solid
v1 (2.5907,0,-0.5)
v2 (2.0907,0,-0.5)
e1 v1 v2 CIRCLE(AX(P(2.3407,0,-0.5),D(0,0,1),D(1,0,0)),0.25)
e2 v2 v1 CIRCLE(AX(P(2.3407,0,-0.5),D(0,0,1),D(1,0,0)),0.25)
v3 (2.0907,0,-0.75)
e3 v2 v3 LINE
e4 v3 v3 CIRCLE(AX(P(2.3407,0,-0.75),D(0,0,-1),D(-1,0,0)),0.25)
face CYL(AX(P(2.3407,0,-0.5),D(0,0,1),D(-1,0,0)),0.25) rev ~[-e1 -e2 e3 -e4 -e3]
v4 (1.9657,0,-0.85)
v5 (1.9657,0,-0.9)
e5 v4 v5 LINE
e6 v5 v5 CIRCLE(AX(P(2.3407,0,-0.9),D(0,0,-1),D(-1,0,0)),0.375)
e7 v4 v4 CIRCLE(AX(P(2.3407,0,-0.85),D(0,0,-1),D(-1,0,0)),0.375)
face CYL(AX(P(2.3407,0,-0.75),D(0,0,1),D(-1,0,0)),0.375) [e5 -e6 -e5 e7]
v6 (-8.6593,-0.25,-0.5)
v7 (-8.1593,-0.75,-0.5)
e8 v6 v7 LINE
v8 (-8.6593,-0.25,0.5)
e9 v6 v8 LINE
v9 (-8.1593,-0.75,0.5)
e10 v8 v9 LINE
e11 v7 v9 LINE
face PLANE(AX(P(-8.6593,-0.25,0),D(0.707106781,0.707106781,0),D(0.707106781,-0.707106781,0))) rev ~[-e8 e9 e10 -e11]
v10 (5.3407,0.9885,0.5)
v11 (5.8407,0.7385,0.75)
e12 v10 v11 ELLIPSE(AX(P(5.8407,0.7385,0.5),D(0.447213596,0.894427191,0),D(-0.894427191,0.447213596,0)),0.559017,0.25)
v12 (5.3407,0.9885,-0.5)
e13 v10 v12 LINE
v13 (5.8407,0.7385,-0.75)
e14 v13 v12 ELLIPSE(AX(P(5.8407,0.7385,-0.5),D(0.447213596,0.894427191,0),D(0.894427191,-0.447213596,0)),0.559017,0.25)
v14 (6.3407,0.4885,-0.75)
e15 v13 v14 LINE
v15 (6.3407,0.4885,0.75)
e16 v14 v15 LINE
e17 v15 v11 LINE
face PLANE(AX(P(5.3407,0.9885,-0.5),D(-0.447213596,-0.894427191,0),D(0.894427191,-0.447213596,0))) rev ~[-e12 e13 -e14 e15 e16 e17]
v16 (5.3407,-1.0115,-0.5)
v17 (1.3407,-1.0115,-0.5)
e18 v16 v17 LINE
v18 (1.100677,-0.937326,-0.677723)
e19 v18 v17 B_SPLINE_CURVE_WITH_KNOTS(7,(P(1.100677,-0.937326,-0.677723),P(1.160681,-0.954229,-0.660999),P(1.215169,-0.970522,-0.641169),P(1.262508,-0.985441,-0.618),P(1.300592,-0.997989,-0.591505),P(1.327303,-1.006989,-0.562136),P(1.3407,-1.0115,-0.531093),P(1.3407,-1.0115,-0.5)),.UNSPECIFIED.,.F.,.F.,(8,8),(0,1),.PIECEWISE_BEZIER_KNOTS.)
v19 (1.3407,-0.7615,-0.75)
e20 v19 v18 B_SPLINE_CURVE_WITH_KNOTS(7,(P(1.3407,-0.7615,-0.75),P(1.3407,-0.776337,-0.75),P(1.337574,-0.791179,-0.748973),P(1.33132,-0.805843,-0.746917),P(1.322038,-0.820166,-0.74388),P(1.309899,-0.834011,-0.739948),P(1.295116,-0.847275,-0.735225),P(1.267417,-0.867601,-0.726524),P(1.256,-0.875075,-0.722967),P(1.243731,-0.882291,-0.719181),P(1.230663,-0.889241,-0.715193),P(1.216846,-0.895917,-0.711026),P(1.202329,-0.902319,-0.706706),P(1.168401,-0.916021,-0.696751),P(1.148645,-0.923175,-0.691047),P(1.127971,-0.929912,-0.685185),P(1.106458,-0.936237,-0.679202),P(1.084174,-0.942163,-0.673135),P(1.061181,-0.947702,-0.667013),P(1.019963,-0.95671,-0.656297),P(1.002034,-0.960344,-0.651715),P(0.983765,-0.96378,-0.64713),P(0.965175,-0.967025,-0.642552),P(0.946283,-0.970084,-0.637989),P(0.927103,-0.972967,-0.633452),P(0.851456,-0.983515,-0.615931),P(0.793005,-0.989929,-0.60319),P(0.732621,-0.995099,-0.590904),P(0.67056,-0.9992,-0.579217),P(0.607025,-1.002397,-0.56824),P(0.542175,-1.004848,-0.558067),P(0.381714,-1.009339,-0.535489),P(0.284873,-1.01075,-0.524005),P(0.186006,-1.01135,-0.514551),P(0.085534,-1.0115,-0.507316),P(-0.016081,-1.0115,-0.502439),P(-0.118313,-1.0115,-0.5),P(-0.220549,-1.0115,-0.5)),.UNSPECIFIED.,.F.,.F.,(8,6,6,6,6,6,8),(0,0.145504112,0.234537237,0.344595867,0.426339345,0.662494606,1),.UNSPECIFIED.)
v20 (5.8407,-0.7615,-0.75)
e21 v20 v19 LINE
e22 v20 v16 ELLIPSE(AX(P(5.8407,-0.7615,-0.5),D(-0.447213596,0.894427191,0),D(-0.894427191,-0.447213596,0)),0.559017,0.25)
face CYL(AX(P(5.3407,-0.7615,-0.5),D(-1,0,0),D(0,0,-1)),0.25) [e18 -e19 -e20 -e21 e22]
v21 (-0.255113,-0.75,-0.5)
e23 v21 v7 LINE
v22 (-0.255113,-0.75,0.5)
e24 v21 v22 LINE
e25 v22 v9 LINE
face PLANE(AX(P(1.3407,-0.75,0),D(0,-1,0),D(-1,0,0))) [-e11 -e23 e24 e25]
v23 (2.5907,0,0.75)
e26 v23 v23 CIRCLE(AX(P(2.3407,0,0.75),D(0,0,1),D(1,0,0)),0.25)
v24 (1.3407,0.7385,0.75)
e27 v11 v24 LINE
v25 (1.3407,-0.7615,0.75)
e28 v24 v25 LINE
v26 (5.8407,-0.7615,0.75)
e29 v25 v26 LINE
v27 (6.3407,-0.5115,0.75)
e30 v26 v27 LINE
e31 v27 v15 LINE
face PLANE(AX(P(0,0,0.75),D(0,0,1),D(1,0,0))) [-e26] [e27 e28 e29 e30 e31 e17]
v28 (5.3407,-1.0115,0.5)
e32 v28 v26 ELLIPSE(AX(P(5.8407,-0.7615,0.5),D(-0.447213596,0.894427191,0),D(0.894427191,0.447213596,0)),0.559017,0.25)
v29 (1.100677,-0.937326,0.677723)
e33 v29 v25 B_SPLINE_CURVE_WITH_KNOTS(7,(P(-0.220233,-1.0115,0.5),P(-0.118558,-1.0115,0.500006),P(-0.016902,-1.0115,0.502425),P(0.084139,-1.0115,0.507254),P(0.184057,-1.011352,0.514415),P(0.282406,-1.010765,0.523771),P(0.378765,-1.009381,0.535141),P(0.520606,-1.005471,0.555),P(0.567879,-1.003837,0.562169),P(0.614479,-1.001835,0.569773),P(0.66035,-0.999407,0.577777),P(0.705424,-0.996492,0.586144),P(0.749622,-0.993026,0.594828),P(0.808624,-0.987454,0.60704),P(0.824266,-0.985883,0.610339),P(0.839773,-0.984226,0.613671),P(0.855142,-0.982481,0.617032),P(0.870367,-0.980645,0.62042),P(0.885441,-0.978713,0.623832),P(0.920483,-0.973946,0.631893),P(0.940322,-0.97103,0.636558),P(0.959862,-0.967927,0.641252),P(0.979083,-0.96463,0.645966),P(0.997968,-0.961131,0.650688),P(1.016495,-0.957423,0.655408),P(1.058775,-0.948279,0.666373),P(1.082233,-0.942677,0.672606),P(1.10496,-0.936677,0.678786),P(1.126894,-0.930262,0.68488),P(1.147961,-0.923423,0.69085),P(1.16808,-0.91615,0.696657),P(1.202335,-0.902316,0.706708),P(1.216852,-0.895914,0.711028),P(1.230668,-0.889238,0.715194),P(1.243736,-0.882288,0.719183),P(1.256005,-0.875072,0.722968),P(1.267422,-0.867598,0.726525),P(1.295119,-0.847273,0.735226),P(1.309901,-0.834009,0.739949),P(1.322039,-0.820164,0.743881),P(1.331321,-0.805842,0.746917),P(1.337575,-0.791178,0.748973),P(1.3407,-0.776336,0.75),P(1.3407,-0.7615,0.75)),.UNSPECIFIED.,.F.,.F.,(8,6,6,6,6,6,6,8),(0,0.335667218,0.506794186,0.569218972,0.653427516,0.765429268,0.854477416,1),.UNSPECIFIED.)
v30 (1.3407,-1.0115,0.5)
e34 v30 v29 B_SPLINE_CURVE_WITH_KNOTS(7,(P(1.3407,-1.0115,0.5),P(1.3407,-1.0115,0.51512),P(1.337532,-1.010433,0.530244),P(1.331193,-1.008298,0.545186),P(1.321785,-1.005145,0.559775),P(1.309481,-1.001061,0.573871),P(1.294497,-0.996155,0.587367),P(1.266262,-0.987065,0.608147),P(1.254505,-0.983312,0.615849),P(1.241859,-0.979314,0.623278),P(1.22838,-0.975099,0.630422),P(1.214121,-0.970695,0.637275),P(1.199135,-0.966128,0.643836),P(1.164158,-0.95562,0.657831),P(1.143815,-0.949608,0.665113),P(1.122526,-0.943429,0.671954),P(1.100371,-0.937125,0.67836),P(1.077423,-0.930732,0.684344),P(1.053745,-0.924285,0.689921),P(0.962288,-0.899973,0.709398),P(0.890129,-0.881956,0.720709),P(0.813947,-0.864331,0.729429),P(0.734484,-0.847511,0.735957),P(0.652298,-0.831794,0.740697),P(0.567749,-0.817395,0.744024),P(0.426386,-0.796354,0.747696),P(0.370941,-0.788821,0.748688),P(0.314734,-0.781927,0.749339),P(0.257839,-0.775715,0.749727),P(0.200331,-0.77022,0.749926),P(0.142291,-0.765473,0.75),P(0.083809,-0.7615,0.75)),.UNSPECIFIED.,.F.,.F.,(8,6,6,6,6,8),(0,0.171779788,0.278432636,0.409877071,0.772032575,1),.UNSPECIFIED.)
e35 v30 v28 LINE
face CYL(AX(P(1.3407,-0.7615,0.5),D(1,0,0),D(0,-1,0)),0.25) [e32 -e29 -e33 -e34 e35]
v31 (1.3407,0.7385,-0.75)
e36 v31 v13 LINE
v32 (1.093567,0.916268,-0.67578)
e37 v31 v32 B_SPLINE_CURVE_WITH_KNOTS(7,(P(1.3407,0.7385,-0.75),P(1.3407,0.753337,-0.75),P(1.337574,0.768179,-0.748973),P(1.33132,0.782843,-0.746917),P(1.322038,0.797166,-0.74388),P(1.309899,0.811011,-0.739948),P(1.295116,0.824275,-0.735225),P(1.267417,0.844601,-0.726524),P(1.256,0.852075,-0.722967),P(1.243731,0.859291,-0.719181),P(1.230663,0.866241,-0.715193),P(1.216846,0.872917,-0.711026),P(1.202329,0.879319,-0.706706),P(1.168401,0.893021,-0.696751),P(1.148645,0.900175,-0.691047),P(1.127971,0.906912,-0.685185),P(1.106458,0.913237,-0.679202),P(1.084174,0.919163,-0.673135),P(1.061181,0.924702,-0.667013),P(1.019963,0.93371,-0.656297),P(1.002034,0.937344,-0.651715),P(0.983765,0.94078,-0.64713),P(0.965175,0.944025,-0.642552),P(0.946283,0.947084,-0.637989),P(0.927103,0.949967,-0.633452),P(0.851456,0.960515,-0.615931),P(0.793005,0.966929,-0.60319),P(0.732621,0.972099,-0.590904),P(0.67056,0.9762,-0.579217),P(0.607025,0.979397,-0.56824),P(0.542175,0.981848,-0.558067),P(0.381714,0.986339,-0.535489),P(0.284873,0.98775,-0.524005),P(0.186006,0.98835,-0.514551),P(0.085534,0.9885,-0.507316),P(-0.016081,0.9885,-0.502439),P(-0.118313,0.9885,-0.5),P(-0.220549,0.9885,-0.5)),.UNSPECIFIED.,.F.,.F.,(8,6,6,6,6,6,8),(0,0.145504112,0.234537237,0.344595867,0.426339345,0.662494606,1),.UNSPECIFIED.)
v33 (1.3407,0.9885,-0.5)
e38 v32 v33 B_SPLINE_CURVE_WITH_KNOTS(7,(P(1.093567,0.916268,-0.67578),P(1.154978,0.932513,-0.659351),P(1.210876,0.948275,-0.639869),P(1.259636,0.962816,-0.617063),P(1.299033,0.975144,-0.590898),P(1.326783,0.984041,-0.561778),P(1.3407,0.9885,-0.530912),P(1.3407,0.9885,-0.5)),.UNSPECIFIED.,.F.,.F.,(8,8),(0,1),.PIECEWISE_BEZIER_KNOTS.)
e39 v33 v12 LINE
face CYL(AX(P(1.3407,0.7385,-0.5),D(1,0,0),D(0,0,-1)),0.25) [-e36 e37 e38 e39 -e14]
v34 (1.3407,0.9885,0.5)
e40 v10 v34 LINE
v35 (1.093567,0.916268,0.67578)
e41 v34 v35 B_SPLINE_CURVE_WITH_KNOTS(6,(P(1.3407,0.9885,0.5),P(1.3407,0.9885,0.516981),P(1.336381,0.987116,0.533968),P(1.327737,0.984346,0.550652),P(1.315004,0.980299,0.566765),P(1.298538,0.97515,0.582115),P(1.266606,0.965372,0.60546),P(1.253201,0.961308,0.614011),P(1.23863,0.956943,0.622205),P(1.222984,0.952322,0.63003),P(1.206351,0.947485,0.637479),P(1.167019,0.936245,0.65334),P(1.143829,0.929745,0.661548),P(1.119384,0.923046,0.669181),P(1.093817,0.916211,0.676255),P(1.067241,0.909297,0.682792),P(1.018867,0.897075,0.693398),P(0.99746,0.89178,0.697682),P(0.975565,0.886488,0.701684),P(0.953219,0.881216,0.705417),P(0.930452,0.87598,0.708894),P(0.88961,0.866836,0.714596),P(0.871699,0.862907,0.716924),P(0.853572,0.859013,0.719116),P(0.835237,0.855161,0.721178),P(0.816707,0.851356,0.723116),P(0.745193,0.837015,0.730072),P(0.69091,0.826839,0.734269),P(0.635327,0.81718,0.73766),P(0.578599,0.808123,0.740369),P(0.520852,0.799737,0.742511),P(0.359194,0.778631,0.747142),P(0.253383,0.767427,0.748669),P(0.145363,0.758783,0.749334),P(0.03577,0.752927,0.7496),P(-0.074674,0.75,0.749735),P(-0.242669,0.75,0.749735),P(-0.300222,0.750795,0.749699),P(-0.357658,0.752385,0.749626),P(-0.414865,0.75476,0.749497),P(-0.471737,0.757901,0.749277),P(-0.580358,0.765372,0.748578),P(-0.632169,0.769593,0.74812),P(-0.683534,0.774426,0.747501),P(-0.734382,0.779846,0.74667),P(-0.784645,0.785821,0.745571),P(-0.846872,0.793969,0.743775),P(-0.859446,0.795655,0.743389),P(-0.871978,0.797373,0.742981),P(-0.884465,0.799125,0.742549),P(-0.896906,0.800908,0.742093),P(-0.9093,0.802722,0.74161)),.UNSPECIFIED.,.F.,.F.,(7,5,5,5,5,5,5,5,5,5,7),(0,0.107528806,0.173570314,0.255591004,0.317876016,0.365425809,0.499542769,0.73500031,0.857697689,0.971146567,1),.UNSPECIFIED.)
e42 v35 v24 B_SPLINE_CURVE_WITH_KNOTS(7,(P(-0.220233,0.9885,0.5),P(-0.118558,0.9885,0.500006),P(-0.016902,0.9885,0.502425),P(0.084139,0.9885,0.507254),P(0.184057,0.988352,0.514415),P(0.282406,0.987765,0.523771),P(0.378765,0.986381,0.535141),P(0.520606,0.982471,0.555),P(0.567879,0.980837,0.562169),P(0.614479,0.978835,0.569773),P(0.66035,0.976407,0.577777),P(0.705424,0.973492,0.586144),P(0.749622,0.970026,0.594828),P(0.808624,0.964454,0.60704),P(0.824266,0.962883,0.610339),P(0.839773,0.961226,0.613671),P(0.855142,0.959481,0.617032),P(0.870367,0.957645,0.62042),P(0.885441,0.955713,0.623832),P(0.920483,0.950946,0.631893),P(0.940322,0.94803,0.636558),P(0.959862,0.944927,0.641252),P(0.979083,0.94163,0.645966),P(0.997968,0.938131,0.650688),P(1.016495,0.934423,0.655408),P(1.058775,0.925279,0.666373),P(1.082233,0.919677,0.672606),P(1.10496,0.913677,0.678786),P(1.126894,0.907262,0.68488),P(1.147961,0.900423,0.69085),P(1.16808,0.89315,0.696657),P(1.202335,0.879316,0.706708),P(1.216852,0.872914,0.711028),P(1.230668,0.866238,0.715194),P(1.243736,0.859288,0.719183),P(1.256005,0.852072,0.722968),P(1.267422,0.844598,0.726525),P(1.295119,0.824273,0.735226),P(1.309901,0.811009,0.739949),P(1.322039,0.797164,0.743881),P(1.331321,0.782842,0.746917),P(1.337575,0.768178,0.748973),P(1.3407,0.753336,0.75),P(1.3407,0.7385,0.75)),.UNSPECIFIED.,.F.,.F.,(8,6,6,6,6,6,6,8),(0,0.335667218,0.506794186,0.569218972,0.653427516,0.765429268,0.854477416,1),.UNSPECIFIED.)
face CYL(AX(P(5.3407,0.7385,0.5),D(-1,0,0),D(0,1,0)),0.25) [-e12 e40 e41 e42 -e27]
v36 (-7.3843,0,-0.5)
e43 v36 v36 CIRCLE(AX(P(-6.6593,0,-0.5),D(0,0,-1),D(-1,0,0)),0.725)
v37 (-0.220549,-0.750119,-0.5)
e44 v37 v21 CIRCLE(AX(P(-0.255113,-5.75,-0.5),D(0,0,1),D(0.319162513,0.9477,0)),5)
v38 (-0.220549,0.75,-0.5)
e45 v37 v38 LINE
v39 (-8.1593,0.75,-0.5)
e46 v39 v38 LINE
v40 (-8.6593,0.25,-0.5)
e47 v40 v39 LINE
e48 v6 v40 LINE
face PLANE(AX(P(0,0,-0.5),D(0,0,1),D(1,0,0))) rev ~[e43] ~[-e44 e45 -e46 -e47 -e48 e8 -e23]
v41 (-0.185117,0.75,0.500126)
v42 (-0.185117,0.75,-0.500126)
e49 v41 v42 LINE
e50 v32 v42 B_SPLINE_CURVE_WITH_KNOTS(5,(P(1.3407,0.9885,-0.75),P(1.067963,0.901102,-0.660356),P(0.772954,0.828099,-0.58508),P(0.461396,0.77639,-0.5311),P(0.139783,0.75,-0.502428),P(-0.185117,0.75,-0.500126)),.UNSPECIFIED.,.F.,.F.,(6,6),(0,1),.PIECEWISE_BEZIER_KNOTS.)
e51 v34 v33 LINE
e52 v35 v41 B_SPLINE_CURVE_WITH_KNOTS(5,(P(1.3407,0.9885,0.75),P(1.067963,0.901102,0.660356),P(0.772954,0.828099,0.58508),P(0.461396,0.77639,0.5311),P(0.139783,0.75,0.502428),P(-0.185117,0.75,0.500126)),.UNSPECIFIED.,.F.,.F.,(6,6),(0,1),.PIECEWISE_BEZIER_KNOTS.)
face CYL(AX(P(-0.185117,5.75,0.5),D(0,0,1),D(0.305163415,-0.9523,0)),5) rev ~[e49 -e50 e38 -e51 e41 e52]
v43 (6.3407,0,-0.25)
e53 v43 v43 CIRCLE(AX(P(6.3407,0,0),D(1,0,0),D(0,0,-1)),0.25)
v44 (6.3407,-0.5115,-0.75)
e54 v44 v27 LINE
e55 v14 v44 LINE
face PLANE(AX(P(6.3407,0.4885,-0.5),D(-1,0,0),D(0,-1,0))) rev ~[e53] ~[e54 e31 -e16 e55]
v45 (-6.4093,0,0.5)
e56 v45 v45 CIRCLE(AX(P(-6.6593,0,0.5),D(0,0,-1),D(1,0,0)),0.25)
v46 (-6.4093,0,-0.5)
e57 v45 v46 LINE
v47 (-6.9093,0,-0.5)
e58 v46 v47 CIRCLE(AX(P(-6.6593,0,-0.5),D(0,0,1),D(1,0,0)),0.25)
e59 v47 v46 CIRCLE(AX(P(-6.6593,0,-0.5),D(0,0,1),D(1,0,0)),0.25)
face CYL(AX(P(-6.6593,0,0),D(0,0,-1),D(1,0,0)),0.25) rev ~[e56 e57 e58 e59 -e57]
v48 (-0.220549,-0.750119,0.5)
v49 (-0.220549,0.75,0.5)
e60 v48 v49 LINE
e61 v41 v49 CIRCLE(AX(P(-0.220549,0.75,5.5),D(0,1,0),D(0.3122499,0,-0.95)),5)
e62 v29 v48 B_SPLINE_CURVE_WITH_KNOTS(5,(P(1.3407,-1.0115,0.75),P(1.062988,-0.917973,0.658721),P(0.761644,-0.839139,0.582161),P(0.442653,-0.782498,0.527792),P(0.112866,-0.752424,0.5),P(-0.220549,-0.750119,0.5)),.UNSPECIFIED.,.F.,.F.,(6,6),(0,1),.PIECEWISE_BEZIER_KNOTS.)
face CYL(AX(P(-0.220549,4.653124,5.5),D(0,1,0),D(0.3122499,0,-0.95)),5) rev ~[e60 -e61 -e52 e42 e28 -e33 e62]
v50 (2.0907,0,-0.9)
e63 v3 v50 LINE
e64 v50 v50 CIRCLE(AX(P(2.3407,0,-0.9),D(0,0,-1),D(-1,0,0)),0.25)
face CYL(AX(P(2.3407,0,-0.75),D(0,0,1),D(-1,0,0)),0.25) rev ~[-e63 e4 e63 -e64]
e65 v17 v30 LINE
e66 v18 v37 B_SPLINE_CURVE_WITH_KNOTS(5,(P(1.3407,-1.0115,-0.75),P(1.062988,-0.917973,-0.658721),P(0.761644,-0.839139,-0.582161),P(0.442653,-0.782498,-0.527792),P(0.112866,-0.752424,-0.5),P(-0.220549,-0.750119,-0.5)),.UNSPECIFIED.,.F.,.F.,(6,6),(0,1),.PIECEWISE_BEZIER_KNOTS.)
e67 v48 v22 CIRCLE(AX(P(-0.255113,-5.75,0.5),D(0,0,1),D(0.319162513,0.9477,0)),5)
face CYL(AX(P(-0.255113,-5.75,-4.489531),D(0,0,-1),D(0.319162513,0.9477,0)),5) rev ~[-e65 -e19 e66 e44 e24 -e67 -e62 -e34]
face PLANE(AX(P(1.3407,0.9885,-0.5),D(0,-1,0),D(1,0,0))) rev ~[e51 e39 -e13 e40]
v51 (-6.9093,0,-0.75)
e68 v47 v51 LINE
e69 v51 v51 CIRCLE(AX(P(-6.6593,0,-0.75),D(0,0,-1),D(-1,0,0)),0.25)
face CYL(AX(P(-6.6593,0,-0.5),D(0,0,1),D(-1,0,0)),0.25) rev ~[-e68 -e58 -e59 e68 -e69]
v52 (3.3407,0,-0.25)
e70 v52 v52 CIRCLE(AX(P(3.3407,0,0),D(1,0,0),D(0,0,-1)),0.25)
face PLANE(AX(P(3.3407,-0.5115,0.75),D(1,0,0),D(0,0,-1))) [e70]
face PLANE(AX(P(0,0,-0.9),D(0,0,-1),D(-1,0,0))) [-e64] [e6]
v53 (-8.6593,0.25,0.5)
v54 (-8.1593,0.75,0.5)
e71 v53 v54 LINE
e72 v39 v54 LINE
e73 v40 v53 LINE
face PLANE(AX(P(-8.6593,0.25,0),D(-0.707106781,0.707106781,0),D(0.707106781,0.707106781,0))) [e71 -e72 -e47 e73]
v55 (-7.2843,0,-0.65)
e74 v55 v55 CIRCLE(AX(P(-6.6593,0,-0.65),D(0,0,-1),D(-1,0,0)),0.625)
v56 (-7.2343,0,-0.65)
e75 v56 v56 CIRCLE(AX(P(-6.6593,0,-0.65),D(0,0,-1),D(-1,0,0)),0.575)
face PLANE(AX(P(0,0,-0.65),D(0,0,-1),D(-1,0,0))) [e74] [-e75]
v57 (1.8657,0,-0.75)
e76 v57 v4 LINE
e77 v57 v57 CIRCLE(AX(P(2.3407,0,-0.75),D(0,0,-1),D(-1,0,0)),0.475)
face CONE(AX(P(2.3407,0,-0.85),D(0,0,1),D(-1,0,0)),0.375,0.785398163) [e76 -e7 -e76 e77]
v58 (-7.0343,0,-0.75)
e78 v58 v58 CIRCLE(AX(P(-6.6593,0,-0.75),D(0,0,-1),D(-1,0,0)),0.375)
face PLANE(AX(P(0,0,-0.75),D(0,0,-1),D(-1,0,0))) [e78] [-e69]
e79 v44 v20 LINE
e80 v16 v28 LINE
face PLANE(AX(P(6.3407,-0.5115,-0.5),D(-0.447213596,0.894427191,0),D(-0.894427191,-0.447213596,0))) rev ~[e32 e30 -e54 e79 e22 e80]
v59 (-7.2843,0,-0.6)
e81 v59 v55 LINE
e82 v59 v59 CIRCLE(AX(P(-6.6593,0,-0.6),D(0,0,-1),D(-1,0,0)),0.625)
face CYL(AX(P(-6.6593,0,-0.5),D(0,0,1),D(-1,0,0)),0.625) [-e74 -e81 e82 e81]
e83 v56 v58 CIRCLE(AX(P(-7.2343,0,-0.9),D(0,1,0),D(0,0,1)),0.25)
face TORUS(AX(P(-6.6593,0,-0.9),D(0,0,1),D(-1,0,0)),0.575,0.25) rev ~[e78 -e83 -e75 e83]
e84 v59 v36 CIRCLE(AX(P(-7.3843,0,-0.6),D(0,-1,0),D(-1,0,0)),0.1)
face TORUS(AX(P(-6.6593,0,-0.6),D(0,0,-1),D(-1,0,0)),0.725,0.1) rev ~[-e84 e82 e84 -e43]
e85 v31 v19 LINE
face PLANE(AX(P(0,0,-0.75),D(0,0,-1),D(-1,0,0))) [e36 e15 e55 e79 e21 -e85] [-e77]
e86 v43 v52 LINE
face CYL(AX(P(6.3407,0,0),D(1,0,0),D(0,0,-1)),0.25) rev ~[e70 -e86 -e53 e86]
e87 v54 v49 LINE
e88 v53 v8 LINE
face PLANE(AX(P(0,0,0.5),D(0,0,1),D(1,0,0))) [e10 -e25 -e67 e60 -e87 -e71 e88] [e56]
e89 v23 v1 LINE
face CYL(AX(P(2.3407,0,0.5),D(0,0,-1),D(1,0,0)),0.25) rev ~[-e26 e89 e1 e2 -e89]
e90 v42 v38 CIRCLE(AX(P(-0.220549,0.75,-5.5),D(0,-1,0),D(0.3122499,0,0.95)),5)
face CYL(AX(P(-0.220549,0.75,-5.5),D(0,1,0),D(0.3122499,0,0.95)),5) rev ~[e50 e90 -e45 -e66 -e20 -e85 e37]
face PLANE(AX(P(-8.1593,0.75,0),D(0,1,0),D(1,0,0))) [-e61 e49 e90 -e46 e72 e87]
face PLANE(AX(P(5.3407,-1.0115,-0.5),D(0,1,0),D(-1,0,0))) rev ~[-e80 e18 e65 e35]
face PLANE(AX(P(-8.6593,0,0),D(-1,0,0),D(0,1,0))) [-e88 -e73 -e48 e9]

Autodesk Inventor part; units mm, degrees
ref_plane "YZ Plane" through (0, 0, 0) normal (1, 0, 0) x (0, 1, 0)
ref_plane "XZ Plane" through (0, 0, 0) normal (0, 1, 0) x (-1, 0, 0)
ref_plane "XY Plane" through (0, 0, 0) normal (0, 0, 1) x (1, 0, 0)
sketch "Sketch1" plane through (0, 0, 0) normal (0, 0, 1) x (1, 0, 0)
  line L0 (-8.1593, 0.75) -> (1.3407, 0.75)
  line L1 (1.3407, -0.75) -> (-8.1593, -0.75)
  line L2 (-8.6593, -0.25) -> (-8.6593, 0.25)
  circle A0 centre (-6.6593, 0) radius 0.25
  circle A1 centre (2.3407, 0) radius 0.25
  line L3 (-11.6593, 0) -> (9.3407, 0) projected
  line L4 (1.3407, -0.75) -> (1.3407, -1.0115)
  line L5 (1.3407, 0.75) -> (1.3407, 0.9885)
  line L6 (-8.1593, 0.75) -> (-8.1593, 0.75)
  line L7 (-8.6593, 0.25) -> (-8.6593, 0.25)
  line L8 (-8.1593, -0.75) -> (-8.1593, -0.75)
  line L9 (-8.6593, -0.25) -> (-8.6593, -0.25)
  line L10 (1.3407, 0.9885) -> (5.3407, 0.9885)
  line L11 (6.3407, 0.4885) -> (6.3407, -0.5115)
  line L12 (1.3407, -1.0115) -> (5.3407, -1.0115)
  line L13 (5.3407, -1.0115) -> (6.3407, -0.5115)
  line L14 (5.3407, 0.9885) -> (6.3407, 0.4885)
  line L15 (-8.6593, 0.25) -> (-8.1593, 0.75)
  line L16 (-8.6593, -0.25) -> (-8.1593, -0.75)
  point P0 (0, 0)
  point P1 (-8.6593, 0.75)
  point P2 (-8.6593, -0.75)
  point P3 (6.3407, -1.0115)
  point P4 (6.3407, 0.9885)
  point P5 (-8.6593, 0)
  point P6 (6.3407, 0.9885)
  dimension "d2" = 0.5
  dimension "d4" = 0.5
  dimension "d34" = 9
  dimension "d36" = 1.5
  dimension "d37" = 2
  dimension "d38" = 2
  dimension "d39" = 8
  dimension "d40" = 5
  dimension "d56" = 1
  dimension "d57" = 0.5
  dimension "d58" = 1
  dimension "d59" = 0.5
  dimension "d60" = 0.5
  dimension "d61" = 0.5
  dimension "d62" = 0.5
  dimension "d63" = 0.5
extrude "Extrusion1" add sketch "Sketch1" along normal mid plane 1 contours L0 L5 L10 L14 L11 L3 A1 A0 L2 L15 | L3 A0 A1 L11 L13 L12 L4 L1 L16 L2
sketch "Sketch2" plane through (0, 0, 0.5) normal (0, 0, 1) x (1, 0, 0)
  circle A0 centre (2.3407, 0) radius 0.25 projected
  circle A1 centre (-6.6593, 0) radius 0.25 projected
  line L0 (1.3407, 0.75) -> (-8.1593, 0.75) projected
  line L1 (-8.6593, 0.25) -> (-8.6593, -0.25) projected
  line L2 (-8.1593, -0.75) -> (1.3407, -0.75) projected
  line L3 (1.3407, 0.75) -> (-8.1593, 0.75) projected
  line L4 (1.3407, 0.75) -> (1.3407, -0.75)
  line L5 (1.3407, -0.75) -> (1.3407, -1.0115) projected
  line L6 (1.3407, 0.9885) -> (1.3407, 0.75) projected
  line L7 (1.3407, -1.0115) -> (5.3407, -1.0115) projected
  line L8 (5.3407, -1.0115) -> (6.3407, -0.5115) projected
  line L9 (6.3407, -0.5115) -> (6.3407, 0.4885) projected
  line L10 (6.3407, 0.4885) -> (5.3407, 0.9885) projected
  line L11 (5.3407, 0.9885) -> (1.3407, 0.9885) projected
  line L12 (-8.1593, 0.75) -> (-8.6593, 0.25) projected
  line L13 (-8.6593, -0.25) -> (-8.1593, -0.75) projected
  point P0 (0, 0)
  point P1 (-8.6593, 0.75)
extrude "Extrusion2" add sketch "Sketch2" along normal blind 0.25 contours L6 L11 L10 L9 L8 L7 L5 L4
sketch "Sketch3" plane through (0, 0, -0.5) normal (0, 0, -1) x (-1, 0, 0)
  circle A0 centre (-2.3407, 0) radius 0.25 projected
  circle A1 centre (6.6593, 0) radius 0.25 projected
  line L0 (8.1593, 0.75) -> (-1.3407, 0.75) projected
  line L1 (-1.3407, -0.75) -> (8.1593, -0.75) projected
  line L2 (8.6593, -0.25) -> (8.6593, 0.25) projected
  line L3 (-0.3407, -0.75) -> (-0.3407, 0.75) projected
  line L4 (8.1593, -0.75) -> (-1.3407, -0.75) projected
  line L5 (-1.3407, 0.75) -> (-1.3407, -0.75)
  line L6 (-1.3407, 0.75) -> (-1.3407, 0.9885) projected
  line L7 (-1.3407, -1.0115) -> (-1.3407, -0.75) projected
  line L8 (8.1593, -0.75) -> (8.6593, -0.25) projected
  line L9 (8.6593, 0.25) -> (8.1593, 0.75) projected
  line L10 (-1.3407, 0.9885) -> (-5.3407, 0.9885) projected
  line L11 (-5.3407, 0.9885) -> (-6.3407, 0.4885) projected
  line L12 (-6.3407, 0.4885) -> (-6.3407, -0.5115) projected
  line L13 (-6.3407, -0.5115) -> (-5.3407, -1.0115) projected
  line L14 (-5.3407, -1.0115) -> (-1.3407, -1.0115) projected
  point P0 (0, 0)
  point P1 (8.6593, -0.75)
extrude "Extrusion3" add sketch "Sketch3" along normal blind 0.25 contours L5 L7 L14 L13 L12 L11 L10 L6
fillet "Fillet5" radius 5 4 edges at (1.3407, 0, 0.5) (1.3407, 0.75, 0) (1.3407, -0.75, 0) (1.3407, 0, -0.5)
sketch "Sketch10" plane through (0, 0, -0.75) normal (0, 0, -1) x (-1, 0, 0)
  circle A0 centre (-2.3407, 0) radius 0.25 projected
  circle A1 centre (-2.3407, 0) radius 0.375
  circle A2 centre (-2.3407, 0) radius 0.5
  point P0 (0, 0)
  dimension "d48" = 0.75
  dimension "d49" = 1
extrude "Extrusion10" add sketch "Sketch10" along normal blind 0.15 contours A1
chamfer "Chamfer1" distance 0.1 angle 45 1 edges at (2.7157, 0, -0.75) measured on face at (4.4657, -0.0077, -0.75)
fillet "Fillet6" radius 0.25 1 edges at (3.3407, 0.9885, -0.75)
fillet "Fillet7" radius 0.25 3 edges at (3.3407, -1.0115, -0.75) (3.3407, -1.0115, 0.75) (3.3407, 0.9885, 0.75)
sketch "Sketch12" plane through (0, 0, -0.5) normal (0, 0, -1) x (-1, 0, 0)
  circle A0 centre (6.6593, 0) radius 0.25 projected
  circle A1 centre (6.6593, 0) radius 0.625
  circle A2 centre (6.6593, 0) radius 0.375
  point P0 (0, 0)
  dimension "d66" = 1.25
  dimension "d67" = 0.75
extrude "Extrusion11" add sketch "Sketch12" along normal blind 0.25 contours A2
extrude "Extrusion12" add sketch "Sketch12" along normal blind 0.15 contours A1
fillet "Fillet8" radius 0.25 1 edges at (-6.2843, 0, -0.65)
fillet "Fillet9" radius 0.1 1 edges at (-6.0343, 0, -0.5)
sketch "Sketch14" plane through (6.3407, -0.5115, 0.75) normal (1, 0, 0) x (0, 0, -1)
  circle A0 centre (0.75, 0.5115) radius 0.25
  dimension "d77" = 0.5
extrude "Extrusion13" cut sketch "Sketch14" against normal blind 3
equation "\"d62\" = d60"
equation "\"d63\" = d61"
properties part number "Link_3"
